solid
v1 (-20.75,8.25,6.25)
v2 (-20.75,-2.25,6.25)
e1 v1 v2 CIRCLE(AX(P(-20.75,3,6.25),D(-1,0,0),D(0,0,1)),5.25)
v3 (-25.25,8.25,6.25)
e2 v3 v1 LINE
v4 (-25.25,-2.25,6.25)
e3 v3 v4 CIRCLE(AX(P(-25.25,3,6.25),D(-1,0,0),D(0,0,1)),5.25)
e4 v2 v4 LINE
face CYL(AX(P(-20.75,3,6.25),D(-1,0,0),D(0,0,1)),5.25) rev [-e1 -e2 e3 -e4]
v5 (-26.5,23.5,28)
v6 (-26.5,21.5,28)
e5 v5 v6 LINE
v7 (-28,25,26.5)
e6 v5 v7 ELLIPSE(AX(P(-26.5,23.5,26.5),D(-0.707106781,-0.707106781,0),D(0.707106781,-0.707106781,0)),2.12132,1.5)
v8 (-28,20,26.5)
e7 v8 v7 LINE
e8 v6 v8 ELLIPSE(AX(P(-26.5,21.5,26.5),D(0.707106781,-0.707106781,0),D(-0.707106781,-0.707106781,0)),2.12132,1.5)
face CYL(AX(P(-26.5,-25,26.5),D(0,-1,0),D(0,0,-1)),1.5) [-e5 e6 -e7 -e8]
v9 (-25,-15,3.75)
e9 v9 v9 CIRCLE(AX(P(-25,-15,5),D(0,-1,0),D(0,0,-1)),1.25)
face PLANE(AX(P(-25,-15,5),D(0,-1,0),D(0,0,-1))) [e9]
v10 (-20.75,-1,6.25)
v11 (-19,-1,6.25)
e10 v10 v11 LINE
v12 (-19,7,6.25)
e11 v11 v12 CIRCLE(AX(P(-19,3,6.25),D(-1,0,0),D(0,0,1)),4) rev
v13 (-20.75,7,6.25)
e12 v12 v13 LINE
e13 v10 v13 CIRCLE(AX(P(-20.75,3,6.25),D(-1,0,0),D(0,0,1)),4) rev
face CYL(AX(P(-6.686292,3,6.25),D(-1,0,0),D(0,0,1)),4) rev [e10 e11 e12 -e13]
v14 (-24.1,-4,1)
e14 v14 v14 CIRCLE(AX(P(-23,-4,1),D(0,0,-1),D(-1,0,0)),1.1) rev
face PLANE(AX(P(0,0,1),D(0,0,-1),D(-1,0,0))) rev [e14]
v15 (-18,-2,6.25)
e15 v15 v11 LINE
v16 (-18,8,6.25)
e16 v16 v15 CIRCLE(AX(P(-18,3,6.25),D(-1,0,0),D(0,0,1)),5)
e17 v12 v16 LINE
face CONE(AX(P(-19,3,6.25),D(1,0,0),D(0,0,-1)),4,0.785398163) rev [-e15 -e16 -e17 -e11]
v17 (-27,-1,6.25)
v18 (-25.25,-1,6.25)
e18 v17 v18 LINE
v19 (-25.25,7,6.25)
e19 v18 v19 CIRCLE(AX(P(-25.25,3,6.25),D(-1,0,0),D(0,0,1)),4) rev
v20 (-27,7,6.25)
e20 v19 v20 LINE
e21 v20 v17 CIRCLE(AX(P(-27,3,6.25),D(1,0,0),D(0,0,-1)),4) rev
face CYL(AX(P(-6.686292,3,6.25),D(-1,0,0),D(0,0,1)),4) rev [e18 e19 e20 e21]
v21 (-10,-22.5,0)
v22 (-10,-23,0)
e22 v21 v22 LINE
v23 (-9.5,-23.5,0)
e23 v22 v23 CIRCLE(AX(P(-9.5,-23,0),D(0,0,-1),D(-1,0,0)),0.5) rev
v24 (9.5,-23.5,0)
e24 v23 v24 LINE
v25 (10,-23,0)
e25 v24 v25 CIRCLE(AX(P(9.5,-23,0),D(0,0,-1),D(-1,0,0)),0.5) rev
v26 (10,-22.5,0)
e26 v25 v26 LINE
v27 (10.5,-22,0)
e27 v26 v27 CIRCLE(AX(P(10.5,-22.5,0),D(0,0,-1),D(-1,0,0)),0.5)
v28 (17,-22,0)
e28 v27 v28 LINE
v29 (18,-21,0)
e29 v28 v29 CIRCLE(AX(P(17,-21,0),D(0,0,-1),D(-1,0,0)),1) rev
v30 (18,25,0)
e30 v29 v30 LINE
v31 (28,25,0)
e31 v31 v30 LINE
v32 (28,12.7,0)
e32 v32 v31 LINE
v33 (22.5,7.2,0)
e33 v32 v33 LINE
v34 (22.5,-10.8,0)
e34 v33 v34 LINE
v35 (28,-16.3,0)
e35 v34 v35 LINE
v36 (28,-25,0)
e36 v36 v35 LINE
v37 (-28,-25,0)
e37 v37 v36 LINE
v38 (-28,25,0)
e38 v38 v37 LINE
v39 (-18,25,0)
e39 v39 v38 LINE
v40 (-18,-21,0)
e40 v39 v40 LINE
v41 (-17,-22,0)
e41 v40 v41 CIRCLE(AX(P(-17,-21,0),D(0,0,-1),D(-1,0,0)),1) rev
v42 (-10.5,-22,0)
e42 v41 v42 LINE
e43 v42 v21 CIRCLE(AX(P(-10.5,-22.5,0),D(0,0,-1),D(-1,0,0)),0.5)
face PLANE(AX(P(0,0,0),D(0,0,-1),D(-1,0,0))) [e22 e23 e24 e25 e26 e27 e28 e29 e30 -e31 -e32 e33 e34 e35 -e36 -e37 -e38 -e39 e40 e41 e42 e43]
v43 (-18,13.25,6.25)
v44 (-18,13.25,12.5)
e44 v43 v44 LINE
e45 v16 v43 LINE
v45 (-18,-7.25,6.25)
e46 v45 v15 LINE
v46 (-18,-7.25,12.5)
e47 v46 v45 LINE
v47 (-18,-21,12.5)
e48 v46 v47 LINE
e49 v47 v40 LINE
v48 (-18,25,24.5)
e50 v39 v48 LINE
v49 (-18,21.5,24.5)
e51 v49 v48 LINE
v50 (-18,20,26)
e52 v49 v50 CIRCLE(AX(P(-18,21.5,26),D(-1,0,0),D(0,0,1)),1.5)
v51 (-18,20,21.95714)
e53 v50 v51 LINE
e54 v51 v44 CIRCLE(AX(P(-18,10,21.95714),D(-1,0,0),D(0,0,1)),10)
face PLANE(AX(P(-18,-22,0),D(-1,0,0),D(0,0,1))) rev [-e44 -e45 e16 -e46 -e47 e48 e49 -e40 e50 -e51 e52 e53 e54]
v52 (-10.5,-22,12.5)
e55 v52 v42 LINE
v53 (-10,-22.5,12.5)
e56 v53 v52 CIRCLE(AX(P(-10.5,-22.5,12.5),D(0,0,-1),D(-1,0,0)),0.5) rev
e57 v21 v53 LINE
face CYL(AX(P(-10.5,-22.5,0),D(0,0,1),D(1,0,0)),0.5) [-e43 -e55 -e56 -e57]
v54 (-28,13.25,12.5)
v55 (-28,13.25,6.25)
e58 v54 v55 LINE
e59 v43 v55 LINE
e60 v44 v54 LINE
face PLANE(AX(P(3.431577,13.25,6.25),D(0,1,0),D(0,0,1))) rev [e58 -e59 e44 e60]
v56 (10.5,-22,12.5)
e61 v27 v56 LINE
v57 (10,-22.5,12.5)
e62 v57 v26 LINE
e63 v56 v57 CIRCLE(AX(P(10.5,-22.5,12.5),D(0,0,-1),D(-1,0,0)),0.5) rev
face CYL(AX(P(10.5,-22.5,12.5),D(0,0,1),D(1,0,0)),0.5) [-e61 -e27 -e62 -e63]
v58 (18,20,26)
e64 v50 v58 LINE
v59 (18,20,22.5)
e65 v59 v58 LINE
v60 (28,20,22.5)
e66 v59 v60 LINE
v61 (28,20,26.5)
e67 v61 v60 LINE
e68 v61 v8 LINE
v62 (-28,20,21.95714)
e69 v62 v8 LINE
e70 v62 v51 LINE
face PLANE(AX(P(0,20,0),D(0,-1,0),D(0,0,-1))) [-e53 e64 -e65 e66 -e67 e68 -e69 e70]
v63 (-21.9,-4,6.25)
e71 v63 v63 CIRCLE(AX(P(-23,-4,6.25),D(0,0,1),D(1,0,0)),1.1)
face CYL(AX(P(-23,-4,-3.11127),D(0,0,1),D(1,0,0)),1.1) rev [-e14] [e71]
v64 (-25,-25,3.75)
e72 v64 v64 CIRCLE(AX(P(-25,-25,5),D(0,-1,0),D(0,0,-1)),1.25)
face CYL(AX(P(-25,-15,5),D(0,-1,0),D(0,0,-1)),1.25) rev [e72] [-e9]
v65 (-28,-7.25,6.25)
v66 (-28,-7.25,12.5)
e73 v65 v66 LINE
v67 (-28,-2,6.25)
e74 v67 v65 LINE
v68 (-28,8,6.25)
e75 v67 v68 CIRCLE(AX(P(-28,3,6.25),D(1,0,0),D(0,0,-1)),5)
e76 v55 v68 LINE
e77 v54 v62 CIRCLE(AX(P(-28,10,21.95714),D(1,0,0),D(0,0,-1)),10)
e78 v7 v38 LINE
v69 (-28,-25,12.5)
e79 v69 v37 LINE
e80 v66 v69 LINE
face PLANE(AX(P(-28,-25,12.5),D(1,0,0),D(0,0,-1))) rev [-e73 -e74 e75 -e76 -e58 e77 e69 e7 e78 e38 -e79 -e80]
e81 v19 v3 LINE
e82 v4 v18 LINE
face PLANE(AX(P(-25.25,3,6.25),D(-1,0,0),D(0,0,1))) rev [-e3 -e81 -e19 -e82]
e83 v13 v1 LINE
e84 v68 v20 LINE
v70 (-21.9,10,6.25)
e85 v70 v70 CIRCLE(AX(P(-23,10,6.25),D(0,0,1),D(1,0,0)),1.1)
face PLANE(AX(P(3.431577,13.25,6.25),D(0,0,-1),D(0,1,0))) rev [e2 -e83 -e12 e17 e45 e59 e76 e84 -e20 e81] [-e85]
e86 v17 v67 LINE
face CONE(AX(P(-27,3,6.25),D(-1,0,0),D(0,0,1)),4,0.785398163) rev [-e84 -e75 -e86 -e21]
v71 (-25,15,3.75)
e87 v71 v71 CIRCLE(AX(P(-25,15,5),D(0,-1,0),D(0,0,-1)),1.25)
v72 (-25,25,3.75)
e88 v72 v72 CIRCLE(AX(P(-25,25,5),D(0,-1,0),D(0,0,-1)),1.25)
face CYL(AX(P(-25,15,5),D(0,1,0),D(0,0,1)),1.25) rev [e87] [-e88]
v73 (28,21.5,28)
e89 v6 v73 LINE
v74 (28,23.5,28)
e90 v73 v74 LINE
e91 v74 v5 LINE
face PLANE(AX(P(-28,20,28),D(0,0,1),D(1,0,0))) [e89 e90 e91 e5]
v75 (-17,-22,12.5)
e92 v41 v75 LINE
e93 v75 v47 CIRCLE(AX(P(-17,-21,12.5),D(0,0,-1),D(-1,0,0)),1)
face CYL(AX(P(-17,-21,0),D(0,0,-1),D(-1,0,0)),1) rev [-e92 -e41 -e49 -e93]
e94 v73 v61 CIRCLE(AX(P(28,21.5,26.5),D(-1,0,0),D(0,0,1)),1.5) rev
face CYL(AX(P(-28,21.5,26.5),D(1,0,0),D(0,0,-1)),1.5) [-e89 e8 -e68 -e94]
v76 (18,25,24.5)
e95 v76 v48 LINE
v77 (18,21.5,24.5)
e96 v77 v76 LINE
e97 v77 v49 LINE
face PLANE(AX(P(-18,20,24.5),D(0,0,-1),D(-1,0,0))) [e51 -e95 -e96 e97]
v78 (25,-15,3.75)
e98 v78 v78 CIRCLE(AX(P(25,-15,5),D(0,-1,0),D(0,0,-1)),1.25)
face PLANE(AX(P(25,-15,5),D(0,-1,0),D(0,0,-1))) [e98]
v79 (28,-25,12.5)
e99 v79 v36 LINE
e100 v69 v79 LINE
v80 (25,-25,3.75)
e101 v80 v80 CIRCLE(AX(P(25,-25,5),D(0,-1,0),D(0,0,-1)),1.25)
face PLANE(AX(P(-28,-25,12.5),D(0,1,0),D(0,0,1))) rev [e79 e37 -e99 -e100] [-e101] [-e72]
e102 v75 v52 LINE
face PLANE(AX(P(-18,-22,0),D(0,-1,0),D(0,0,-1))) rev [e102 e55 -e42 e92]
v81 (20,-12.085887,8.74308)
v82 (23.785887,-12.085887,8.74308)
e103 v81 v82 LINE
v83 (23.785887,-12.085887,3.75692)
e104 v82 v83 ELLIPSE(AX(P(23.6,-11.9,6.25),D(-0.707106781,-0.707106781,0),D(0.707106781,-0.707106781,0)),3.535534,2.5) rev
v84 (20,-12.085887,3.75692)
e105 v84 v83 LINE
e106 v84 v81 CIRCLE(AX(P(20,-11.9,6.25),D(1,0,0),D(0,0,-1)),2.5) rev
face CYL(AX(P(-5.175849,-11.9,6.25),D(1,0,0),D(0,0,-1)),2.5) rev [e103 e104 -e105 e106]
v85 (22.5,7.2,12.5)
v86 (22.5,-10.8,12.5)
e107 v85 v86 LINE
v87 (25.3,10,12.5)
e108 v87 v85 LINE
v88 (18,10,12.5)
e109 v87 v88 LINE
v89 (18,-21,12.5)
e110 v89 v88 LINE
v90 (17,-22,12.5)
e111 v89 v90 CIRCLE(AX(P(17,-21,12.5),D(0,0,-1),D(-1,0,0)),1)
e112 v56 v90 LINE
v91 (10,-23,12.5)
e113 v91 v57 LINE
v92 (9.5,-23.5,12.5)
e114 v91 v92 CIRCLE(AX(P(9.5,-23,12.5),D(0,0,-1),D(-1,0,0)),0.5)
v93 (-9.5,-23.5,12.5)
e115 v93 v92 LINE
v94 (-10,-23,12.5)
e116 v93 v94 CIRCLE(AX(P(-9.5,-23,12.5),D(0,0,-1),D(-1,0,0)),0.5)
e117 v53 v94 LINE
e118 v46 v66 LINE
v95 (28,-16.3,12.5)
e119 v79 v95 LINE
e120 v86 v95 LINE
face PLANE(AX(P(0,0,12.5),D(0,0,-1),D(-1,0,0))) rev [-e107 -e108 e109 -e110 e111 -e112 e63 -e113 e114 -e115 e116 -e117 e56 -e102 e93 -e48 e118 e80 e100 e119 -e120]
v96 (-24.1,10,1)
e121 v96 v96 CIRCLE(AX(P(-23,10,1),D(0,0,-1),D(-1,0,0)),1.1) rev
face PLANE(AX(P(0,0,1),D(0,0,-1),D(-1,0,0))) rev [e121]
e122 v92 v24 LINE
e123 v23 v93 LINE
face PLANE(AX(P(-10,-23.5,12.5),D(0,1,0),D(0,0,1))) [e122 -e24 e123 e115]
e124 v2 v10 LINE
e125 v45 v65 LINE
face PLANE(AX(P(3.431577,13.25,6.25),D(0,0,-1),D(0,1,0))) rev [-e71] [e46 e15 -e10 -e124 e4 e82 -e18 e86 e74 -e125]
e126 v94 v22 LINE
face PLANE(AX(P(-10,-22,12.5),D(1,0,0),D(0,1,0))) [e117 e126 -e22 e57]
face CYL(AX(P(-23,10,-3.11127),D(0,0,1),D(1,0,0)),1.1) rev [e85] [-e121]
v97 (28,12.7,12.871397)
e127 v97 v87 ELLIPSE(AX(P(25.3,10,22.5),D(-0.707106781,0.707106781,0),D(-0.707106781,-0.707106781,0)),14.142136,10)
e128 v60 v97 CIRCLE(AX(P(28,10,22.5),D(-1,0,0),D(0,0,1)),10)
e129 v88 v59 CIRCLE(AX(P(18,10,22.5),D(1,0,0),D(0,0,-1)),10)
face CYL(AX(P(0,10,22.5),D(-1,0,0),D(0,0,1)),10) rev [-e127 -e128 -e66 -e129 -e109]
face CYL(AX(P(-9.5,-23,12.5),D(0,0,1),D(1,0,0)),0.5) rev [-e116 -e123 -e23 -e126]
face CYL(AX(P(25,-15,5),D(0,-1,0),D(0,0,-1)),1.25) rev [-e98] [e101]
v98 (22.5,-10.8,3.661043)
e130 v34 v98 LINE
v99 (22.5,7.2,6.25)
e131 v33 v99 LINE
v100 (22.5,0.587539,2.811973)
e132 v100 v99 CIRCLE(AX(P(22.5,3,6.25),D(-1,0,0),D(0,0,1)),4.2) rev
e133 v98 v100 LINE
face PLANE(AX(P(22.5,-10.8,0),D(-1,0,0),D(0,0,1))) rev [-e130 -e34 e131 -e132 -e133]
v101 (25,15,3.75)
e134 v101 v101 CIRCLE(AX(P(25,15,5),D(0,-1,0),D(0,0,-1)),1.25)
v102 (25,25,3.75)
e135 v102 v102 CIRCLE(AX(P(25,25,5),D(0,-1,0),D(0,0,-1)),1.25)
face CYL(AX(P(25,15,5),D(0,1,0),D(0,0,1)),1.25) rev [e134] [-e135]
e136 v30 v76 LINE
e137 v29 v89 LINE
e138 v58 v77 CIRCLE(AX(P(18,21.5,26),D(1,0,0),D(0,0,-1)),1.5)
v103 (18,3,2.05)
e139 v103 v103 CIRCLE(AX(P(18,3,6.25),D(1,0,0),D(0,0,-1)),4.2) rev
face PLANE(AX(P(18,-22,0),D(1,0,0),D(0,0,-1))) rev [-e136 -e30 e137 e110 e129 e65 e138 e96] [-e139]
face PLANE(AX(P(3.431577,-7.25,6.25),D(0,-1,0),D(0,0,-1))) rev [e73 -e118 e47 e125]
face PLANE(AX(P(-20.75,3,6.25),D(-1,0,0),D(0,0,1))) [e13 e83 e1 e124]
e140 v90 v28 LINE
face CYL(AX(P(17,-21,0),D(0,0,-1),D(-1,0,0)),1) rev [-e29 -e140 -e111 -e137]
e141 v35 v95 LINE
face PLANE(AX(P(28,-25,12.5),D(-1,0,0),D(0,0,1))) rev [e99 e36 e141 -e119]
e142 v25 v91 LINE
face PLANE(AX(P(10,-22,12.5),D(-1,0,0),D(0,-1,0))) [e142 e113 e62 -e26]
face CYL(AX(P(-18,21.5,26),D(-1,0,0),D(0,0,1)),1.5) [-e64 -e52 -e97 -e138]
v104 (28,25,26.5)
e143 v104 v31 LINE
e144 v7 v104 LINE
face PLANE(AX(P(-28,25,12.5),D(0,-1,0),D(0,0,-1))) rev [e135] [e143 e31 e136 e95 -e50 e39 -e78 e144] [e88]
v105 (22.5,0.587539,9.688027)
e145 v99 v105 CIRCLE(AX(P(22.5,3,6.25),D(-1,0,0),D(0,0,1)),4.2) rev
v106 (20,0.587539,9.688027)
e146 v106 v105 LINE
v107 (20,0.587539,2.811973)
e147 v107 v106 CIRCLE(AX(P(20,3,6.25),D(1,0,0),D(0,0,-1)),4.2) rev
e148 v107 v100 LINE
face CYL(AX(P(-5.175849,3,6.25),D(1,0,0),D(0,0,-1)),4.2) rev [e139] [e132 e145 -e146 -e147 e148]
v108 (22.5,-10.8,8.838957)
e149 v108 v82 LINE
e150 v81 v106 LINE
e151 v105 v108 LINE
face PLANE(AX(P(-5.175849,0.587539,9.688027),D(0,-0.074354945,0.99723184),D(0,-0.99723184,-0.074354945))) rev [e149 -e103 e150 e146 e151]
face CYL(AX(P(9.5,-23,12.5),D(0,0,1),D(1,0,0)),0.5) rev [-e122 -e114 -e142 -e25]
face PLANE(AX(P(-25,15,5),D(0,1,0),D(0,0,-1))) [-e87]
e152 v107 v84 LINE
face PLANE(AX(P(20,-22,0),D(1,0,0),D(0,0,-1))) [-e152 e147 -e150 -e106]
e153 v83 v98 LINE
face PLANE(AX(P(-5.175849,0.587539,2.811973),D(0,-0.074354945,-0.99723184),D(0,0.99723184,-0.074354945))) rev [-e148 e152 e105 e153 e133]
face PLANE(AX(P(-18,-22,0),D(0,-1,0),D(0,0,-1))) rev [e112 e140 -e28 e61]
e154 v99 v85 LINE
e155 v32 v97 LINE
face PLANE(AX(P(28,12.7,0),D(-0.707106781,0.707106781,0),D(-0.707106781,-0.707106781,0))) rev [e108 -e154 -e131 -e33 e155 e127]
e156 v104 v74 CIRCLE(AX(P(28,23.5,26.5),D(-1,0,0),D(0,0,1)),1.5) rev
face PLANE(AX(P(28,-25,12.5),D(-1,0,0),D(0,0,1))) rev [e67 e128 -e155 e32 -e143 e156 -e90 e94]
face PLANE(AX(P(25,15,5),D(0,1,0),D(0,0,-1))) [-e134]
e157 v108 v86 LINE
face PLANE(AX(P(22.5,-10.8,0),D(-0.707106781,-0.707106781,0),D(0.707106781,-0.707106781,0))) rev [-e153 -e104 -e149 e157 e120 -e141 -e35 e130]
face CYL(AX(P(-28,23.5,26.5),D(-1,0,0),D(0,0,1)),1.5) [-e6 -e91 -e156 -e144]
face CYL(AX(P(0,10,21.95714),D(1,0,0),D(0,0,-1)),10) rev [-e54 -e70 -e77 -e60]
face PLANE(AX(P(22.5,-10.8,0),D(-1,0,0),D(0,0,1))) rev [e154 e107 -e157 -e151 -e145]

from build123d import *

# Parameters (mm, degrees)
SKETCH_1_W             = 56
SKETCH_1_H             = 50
EXTRUDE_487_DEPTH      = 12.5
SKETCH_3_W             = 36
SKETCH_3_H             = 46
CUT_EXTRUDE_730_DEPTH  = 40.563240514
SKETCH_11_R            = 1.25
CUT_EXTRUDE_984_DEPTH  = 10
CUT_EXTRUDE_1451_DEPTH = 8
CUT_EXTRUDE_1793_REACH = 64.588
SKETCH_4_R             = 4.2
SKETCH_6_R             = 4
CUT_EXTRUDE_1930_DEPTH = 10
SKETCH_7_W             = 6.25
SKETCH_7_H             = 20.5
CUT_EXTRUDE_2129_DEPTH = 10
SKETCH_8_R             = 5.25
CUT_EXTRUDE_2306_DEPTH = 2.25
SKETCH_9_R             = 1.1
CUT_EXTRUDE_2664_DEPTH = 5.25
CUT_EXTRUDE_3061_DEPTH = 40.563240514
CHAMFER_1_SIZE         = 1
FILLET_1_R             = 1
SKETCH_12_W            = 20
SKETCH_12_H            = 1.5
CUT_EXTRUDE_3473_DEPTH = 40.563240514
FILLET_2_R             = 0.5
CUT_EXTRUDE_4198_REACH = 41.563
SKETCH_13_W            = 36
SKETCH_13_H            = 1
EXTRUDE_4558_DEPTH     = 5
FILLET_3_R             = 10
FILLET_4_R             = 1.5


with BuildPart() as part:
    # Эскиз1 → Extrude 487 (new body)
    with BuildSketch(Plane.XY):
        Rectangle(SKETCH_1_W, SKETCH_1_H)
    extrude(amount=EXTRUDE_487_DEPTH)

    # Эскиз3 → Cut-Extrude 730 (cut, through all)
    with BuildSketch(Plane.XY.offset(12.5)):
        with Locations((0, 1)):
            Rectangle(SKETCH_3_W, SKETCH_3_H)
    extrude(amount=-CUT_EXTRUDE_730_DEPTH, mode=Mode.SUBTRACT)

    # Эскиз11 → Cut-Extrude 984 (cut)
    with BuildSketch(Plane.XZ.offset(25)):
        with Locations(Location((-25, 5, 0), (0, 0, 270))):
            Circle(SKETCH_11_R)
        with Locations(Location((25, 5, 0), (0, 0, 270))):
            Circle(SKETCH_11_R)
    cut_extrude_984 = extrude(amount=-CUT_EXTRUDE_984_DEPTH, mode=Mode.SUBTRACT)

    # Mirror 1028: Cut-Extrude 984 across plane
    add(cut_extrude_984.mirror(Plane.ZX), mode=Mode.SUBTRACT)

    # Эскиз5 → Cut-Extrude 1451 (cut)
    with BuildSketch(Plane(origin=(28, 0, 0), x_dir=(0, 0, -1), z_dir=(1, 0, 0))):
        with BuildLine():
            Line((-9.688027281, 0.587538929), (-8.743079599, -12.085887362))
            ThreePointArc((-8.743079599, -12.085887362), (-6.25, -14.4), (-3.756920401, -12.085887362))
            Line((-3.756920401, -12.085887362), (-2.811972719, 0.587538929))
            ThreePointArc((-2.811972719, 0.587538929), (-6.25, 7.2), (-9.688027281, 0.587538929))
        make_face()
    extrude(amount=-CUT_EXTRUDE_1451_DEPTH, mode=Mode.SUBTRACT)

    # Эскиз4 → Cut-Extrude 1793 (cut, up to next)
    with BuildSketch(Plane(origin=(28, 0, 0), x_dir=(0, 0, -1), z_dir=(1, 0, 0)), mode=Mode.PRIVATE) as cut_extrude_1793_sk1:
        with Locations((-6.25, 3)):
            Circle(SKETCH_4_R)
    cut_extrude_1793_tool1 = extrude(cut_extrude_1793_sk1.sketch, amount=-CUT_EXTRUDE_1793_REACH, mode=Mode.PRIVATE) & part.part
    add(cut_extrude_1793_tool1.solids().sort_by_distance((28, 3, 6.25))[0], mode=Mode.SUBTRACT)

    # Эскиз6 → Cut-Extrude 1930 (cut)
    with BuildSketch(Plane.ZY.offset(28)):
        with Locations((6.25, 3)):
            Circle(SKETCH_6_R)
    extrude(amount=-CUT_EXTRUDE_1930_DEPTH, mode=Mode.SUBTRACT)

    # Эскиз7 → Cut-Extrude 2129 (cut)
    with BuildSketch(Plane.ZY.offset(28)):
        with Locations((9.375, 3)):
            Rectangle(SKETCH_7_W, SKETCH_7_H)
    extrude(amount=-CUT_EXTRUDE_2129_DEPTH, mode=Mode.SUBTRACT)

    # Эскиз8 → Cut-Extrude 2306 (cut, symmetric)
    with BuildSketch(Plane.ZY.offset(23)):
        with Locations((6.25, 3)):
            Circle(SKETCH_8_R)
    extrude(amount=CUT_EXTRUDE_2306_DEPTH, both=True, mode=Mode.SUBTRACT)

    # Эскиз9 → Cut-Extrude 2664 (cut)
    with BuildSketch(Plane.XY.offset(6.25)):
        with Locations((-23, 10)):
            Circle(SKETCH_9_R)
        with Locations((-23, -4)):
            Circle(SKETCH_9_R)
    extrude(amount=-CUT_EXTRUDE_2664_DEPTH, mode=Mode.SUBTRACT)

    # Эскиз10 → Cut-Extrude 3061 (cut, through all)
    with BuildSketch(Plane.XY.offset(12.5)):
        Polygon((28, -16.3), (28, 12.7), (22.5, 7.2), (22.5, -10.8), align=None)
    extrude(amount=-CUT_EXTRUDE_3061_DEPTH, mode=Mode.SUBTRACT)

    # Фаска1
    chamfer_1_edges = [part.edges().sort_by_distance(p)[0] for p in [
        (-28, 3, 2.25),
        (-18, 3, 2.25),
    ]]
    chamfer(chamfer_1_edges, length=CHAMFER_1_SIZE)

    # Скругление1
    fillet_1_edges = [part.edges().sort_by_distance(p)[0] for p in [
        (18, -22, 6.25),
        (-18, -22, 6.25),
    ]]
    fillet(fillet_1_edges, radius=FILLET_1_R)

    # Эскиз12 → Cut-Extrude 3473 (cut, through all)
    with BuildSketch(Plane.XY):
        with Locations((0, -22.75)):
            Rectangle(SKETCH_12_W, SKETCH_12_H)
    extrude(amount=CUT_EXTRUDE_3473_DEPTH, mode=Mode.SUBTRACT)

    # Скругление2
    fillet_2_edges = [part.edges().sort_by_distance(p)[0] for p in [
        (-10, -22, 6.25),
        (-10, -23.5, 6.25),
        (10, -23.5, 6.25),
        (10, -22, 6.25),
    ]]
    fillet(fillet_2_edges, radius=FILLET_2_R)

    # Эскиз13 → Cut-Extrude 4198 (cut, up to next)
    with BuildSketch(Plane.XY.offset(12.5), mode=Mode.PRIVATE) as cut_extrude_4198_sk1:
        with Locations((0, 24.5)):
            Rectangle(SKETCH_13_W, SKETCH_13_H)
    cut_extrude_4198_tool1 = extrude(cut_extrude_4198_sk1.sketch, amount=-CUT_EXTRUDE_4198_REACH, mode=Mode.PRIVATE) & part.part
    add(cut_extrude_4198_tool1.solids().sort_by_distance((0, 24.5, 12.5))[0], mode=Mode.SUBTRACT)

    # Эскиз14 → Extrude 4558 (add)
    with BuildSketch(Plane(origin=(0, 25, 0), x_dir=(1, 0, 0), z_dir=(0, 1, 0))):
        Polygon((-28, -12.5), (-28, -28), (28, -28), (28, -12.5), (18, -12.5), (18, -24.5), (-18, -24.5), (-18, -12.5), align=None)
    extrude(amount=-EXTRUDE_4558_DEPTH)

    # Скругление3
    # the kernel refuses this fillet: 10 mm, written as the material it adds along each edge
    with BuildSketch(Plane(origin=(28, 20, 12.5), x_dir=(0, -1, 0), z_dir=(-1, 0, 0))) as fillet_3_piece_1_section:
        with BuildLine():
            CenterArc((FILLET_3_R, FILLET_3_R), FILLET_3_R, 180, 90)
            Line((0, FILLET_3_R), (0, 0))
            Line((0, 0), (FILLET_3_R, 0))
        make_face()
    fillet_3_piece_1 = extrude(amount=10, mode=Mode.PRIVATE)
    fillet_3_piece_1 = split(fillet_3_piece_1, bisect_by=Plane(origin=(31.65, 16.35, 12.5), z_dir=(-0.7071067811865515, 0.7071067811865436, 0)), keep=Keep.TOP, mode=Mode.PRIVATE)
    add(fillet_3_piece_1)
    with BuildSketch(Plane(origin=(-18, 20, 12.5), x_dir=(0, -1, 0), z_dir=(-1, 0, 0))) as fillet_3_piece_2:
        with BuildLine():
            CenterArc((10, 9.45714016), FILLET_3_R, 180, 71.034425011)
            Line((0, 9.45714016), (0, 0))
            Line((0, 0), (6.75, 0))
        make_face()
    extrude(amount=10)

    # Скругление4
    fillet_4_edges = [part.edges().sort_by_distance(p)[0] for p in [
        (0, 20, 24.5),
        (0, 20, 28),
        (-28, 22.5, 28),
        (0, 25, 28),
    ]]
    fillet(fillet_4_edges, radius=FILLET_4_R)


solid = part.part
